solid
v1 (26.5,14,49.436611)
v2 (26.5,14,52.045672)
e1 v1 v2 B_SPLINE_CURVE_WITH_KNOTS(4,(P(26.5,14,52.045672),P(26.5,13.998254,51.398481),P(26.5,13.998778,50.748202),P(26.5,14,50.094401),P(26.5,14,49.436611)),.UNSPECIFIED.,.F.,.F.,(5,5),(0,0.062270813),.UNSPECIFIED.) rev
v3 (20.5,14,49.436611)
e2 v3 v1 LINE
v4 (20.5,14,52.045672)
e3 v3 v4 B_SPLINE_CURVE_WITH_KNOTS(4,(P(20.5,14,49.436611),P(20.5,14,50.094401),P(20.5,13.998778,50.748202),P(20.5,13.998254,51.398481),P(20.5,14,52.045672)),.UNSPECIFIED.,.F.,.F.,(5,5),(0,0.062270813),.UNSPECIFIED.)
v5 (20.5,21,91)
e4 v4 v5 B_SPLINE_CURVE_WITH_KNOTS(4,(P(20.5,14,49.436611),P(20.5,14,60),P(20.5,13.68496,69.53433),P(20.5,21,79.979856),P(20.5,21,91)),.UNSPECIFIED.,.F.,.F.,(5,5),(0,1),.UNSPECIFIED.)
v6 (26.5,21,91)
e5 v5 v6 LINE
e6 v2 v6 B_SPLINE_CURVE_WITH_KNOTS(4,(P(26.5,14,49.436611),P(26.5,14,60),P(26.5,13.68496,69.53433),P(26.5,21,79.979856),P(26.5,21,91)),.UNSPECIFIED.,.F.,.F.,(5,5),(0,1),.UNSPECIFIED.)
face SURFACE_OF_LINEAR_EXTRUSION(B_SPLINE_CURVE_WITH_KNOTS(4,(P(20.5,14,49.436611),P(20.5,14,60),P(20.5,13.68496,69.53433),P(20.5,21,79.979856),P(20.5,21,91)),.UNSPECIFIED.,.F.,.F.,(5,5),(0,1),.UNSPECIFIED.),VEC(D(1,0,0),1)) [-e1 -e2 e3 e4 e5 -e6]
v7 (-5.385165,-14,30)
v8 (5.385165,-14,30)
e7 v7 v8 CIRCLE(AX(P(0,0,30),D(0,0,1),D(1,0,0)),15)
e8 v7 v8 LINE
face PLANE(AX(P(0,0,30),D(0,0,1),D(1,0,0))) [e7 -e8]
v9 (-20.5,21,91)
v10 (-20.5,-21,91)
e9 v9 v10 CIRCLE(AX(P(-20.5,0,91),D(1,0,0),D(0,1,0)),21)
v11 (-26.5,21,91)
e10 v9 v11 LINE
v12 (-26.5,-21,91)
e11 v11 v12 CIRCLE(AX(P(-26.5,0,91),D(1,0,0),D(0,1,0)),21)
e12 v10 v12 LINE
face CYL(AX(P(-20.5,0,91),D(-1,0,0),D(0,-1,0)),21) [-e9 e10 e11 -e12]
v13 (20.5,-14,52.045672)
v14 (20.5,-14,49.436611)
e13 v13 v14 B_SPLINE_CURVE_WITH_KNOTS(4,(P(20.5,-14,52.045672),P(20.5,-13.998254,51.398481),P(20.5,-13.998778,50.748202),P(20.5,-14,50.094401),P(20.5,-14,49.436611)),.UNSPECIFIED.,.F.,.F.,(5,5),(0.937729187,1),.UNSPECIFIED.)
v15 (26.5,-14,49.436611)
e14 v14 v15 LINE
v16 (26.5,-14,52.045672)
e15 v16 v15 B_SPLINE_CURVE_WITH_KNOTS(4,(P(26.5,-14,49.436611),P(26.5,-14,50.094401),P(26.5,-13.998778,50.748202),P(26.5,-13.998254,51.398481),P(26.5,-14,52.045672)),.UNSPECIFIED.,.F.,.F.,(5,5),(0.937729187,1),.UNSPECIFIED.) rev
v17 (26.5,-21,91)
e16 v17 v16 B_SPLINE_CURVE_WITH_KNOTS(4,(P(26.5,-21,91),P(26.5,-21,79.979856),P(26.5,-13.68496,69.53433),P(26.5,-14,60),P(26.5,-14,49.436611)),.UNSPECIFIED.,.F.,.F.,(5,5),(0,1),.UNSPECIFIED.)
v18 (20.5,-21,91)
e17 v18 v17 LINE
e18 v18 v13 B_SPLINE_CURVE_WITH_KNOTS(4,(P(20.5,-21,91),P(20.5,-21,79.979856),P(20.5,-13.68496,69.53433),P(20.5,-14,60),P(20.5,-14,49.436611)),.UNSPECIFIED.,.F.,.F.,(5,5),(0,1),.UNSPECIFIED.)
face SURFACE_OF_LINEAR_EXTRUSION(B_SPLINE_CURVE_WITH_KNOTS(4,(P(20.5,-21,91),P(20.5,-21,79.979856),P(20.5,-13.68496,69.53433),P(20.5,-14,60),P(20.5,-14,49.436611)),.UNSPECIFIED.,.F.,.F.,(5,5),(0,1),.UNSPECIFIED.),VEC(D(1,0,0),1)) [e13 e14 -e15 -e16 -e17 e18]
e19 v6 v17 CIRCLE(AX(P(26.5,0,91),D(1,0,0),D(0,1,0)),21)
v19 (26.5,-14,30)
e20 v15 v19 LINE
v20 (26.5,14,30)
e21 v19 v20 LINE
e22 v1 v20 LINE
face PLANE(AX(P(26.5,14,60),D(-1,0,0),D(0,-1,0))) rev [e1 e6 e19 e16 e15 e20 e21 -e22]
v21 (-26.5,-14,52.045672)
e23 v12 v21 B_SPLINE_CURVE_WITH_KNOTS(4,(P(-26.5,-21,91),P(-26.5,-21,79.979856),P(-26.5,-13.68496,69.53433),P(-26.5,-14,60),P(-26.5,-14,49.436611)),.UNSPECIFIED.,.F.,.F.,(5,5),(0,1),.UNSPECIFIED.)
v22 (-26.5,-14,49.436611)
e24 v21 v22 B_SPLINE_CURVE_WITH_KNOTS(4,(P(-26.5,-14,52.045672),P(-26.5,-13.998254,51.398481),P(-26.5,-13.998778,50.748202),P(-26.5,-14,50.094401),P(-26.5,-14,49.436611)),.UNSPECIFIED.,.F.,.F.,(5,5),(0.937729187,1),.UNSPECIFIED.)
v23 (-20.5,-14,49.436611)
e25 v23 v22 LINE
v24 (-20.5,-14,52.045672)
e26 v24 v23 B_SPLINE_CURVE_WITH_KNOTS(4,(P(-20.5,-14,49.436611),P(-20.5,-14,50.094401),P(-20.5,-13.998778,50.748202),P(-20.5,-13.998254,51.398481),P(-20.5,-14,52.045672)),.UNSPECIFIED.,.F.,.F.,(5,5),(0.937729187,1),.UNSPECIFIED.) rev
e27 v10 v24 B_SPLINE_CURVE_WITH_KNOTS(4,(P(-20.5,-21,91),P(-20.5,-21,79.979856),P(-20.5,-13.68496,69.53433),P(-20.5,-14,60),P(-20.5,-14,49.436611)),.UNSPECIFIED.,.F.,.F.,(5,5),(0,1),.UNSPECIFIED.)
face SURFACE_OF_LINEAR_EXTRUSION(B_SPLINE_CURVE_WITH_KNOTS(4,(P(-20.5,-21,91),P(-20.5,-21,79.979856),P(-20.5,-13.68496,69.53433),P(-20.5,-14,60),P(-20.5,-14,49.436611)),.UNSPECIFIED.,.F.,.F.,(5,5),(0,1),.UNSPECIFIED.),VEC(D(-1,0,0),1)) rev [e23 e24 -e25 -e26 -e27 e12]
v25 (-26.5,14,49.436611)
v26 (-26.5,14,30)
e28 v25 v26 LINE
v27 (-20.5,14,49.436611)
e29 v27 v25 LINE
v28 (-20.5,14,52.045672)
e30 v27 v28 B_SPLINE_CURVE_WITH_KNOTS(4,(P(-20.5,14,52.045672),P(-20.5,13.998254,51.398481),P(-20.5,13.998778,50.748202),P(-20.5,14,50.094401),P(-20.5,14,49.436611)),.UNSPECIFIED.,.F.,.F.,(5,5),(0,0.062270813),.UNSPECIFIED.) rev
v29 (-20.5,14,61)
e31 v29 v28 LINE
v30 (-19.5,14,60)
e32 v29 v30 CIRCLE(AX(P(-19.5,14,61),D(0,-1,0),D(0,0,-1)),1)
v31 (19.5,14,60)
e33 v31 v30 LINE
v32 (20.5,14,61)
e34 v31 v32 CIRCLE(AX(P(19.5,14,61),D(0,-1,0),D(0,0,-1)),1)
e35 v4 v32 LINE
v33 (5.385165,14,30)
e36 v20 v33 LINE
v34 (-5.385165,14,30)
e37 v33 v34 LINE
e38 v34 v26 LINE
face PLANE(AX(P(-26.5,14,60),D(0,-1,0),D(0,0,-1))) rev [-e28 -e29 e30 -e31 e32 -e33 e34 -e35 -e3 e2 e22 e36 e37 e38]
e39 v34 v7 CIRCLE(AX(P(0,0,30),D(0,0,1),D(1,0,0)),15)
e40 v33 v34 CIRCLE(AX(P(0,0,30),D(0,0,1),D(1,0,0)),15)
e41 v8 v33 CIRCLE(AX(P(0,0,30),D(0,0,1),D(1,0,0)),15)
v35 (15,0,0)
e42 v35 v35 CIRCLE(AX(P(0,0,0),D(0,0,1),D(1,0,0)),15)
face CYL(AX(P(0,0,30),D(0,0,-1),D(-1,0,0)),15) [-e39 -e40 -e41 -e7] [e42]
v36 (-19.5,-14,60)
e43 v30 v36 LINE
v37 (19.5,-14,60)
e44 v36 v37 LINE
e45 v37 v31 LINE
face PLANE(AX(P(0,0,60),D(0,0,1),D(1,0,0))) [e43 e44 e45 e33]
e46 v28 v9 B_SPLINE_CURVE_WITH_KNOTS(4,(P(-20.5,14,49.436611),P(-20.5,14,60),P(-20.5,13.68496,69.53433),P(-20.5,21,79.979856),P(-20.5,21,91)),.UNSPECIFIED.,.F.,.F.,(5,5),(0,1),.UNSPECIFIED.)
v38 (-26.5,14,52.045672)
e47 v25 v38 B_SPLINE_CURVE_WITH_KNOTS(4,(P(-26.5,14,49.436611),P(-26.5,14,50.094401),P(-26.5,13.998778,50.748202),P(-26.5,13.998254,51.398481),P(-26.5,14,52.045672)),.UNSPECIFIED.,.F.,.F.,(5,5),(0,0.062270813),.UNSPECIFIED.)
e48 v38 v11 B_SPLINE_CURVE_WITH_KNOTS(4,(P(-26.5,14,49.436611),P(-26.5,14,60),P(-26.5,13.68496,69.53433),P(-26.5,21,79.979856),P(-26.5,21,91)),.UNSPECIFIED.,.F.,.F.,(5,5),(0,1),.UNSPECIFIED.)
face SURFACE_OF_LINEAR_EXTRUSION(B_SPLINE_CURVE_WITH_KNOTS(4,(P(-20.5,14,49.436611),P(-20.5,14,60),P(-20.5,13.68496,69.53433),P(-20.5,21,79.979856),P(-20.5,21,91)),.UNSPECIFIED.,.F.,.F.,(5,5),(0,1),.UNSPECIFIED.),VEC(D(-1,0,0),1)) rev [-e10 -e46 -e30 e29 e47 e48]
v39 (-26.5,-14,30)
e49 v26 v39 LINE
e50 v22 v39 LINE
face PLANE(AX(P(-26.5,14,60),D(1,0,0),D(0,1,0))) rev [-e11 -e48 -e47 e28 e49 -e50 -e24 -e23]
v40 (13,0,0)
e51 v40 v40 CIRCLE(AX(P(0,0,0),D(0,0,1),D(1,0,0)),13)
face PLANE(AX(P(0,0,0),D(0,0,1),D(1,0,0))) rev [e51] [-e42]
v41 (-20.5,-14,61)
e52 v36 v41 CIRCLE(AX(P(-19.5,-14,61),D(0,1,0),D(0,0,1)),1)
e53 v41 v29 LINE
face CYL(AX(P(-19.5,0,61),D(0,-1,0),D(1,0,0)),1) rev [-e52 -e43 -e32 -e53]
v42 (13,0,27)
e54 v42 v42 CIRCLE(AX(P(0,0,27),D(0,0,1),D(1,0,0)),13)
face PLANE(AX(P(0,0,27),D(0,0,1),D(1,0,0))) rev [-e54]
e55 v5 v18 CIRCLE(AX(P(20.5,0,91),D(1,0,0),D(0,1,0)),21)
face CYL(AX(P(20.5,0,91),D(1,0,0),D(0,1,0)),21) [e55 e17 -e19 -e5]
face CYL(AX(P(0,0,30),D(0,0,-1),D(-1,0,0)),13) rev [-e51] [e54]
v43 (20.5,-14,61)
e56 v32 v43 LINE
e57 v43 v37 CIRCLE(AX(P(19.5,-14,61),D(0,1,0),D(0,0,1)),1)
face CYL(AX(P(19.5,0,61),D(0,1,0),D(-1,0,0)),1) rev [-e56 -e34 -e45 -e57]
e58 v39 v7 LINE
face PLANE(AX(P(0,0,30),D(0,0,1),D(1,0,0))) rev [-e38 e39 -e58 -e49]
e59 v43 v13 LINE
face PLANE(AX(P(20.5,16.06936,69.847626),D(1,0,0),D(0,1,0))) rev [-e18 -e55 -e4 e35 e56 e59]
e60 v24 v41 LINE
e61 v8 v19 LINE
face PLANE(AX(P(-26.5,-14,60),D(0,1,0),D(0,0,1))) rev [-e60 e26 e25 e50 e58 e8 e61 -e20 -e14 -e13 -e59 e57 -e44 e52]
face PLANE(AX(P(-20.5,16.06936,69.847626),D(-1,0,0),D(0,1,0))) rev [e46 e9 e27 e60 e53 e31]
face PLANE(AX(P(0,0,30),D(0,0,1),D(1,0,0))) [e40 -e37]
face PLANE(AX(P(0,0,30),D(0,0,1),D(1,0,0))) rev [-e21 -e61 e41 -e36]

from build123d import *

# Parameters (mm, degrees)
SKETCH1_R           = 15
SKETCH1_R_2         = 13
BOSS_EXTRUDE1_DEPTH = 30
BOSS_EXTRUDE2_START = -3
SKETCH2_R           = 15
BOSS_EXTRUDE2_DEPTH = 3
SKETCH3_W           = 53
SKETCH3_H           = 28
BOSS_EXTRUDE3_DEPTH = 30
BOSS_EXTRUDE5_START = -6
BOSS_EXTRUDE5_DEPTH = 6
FILLET1_R           = 1


# Read off the part's stored shape, not the designer's step: Boss-Extrude5
with BuildPart() as part:
    # Sketch1 → Boss-Extrude1 (new body)
    with BuildSketch(Plane.XY):
        Circle(SKETCH1_R)
        Circle(SKETCH1_R_2, mode=Mode.SUBTRACT)
    extrude(amount=BOSS_EXTRUDE1_DEPTH)

    # Sketch2 → Boss-Extrude2 (add)
    with BuildSketch(Plane.XY.offset(30).offset(BOSS_EXTRUDE2_START)):
        Circle(SKETCH2_R)
    extrude(amount=BOSS_EXTRUDE2_DEPTH)

    # Sketch3 → Boss-Extrude3 (add)
    with BuildSketch(Plane.XY.offset(30)):
        Rectangle(SKETCH3_W, SKETCH3_H)
    extrude(amount=BOSS_EXTRUDE3_DEPTH)

    # Boss-Extrude5 outline → Boss-Extrude5 (add)
    with BuildSketch(Plane(origin=(26.5, 0, 0), x_dir=(0, 0, -1), z_dir=(1, 0, 0)).offset(BOSS_EXTRUDE5_START)):
        with BuildLine():
            Line((-60, 14), (-52.045674019, 14))
            add(Edge.make_bspline(
                [(-52.045674019, 14), (-61.791651738, 14.026298499), (-70.837462314, 14.567622964), (-80.6660896, 21), (-91, 21)],
                knots=[0.062270869, 0.062270869, 0.062270869, 0.062270869, 0.062270869, 1, 1, 1, 1, 1], degree=4))
            ThreePointArc((-91, 21), (-112, 0), (-91, -21))
            add(Edge.make_bspline(
                [(-91, -21), (-80.6660896, -21), (-70.837462314, -14.567622964), (-61.791651738, -14.026298499), (-52.045674019, -14)],
                knots=[0, 0, 0, 0, 0, 0.937729131, 0.937729131, 0.937729131, 0.937729131, 0.937729131], degree=4))
            Line((-52.045674019, -14), (-60, -14))
            Line((-60, -14), (-60, 14))
        make_face()
    boss_extrude5 = extrude(amount=BOSS_EXTRUDE5_DEPTH)

    # Mirror1: Boss-Extrude5 across plane
    add(boss_extrude5.mirror(Plane(origin=(0, 0, 0), x_dir=(0, 0, 1), z_dir=(1, 0, 0))))

    # Fillet1
    fillet1_edges = [part.edges().sort_by_distance(p)[0] for p in [
        (20.5, 0, 60),
        (-20.5, 0, 60),
    ]]
    fillet(fillet1_edges, radius=FILLET1_R)


solid = part.part
